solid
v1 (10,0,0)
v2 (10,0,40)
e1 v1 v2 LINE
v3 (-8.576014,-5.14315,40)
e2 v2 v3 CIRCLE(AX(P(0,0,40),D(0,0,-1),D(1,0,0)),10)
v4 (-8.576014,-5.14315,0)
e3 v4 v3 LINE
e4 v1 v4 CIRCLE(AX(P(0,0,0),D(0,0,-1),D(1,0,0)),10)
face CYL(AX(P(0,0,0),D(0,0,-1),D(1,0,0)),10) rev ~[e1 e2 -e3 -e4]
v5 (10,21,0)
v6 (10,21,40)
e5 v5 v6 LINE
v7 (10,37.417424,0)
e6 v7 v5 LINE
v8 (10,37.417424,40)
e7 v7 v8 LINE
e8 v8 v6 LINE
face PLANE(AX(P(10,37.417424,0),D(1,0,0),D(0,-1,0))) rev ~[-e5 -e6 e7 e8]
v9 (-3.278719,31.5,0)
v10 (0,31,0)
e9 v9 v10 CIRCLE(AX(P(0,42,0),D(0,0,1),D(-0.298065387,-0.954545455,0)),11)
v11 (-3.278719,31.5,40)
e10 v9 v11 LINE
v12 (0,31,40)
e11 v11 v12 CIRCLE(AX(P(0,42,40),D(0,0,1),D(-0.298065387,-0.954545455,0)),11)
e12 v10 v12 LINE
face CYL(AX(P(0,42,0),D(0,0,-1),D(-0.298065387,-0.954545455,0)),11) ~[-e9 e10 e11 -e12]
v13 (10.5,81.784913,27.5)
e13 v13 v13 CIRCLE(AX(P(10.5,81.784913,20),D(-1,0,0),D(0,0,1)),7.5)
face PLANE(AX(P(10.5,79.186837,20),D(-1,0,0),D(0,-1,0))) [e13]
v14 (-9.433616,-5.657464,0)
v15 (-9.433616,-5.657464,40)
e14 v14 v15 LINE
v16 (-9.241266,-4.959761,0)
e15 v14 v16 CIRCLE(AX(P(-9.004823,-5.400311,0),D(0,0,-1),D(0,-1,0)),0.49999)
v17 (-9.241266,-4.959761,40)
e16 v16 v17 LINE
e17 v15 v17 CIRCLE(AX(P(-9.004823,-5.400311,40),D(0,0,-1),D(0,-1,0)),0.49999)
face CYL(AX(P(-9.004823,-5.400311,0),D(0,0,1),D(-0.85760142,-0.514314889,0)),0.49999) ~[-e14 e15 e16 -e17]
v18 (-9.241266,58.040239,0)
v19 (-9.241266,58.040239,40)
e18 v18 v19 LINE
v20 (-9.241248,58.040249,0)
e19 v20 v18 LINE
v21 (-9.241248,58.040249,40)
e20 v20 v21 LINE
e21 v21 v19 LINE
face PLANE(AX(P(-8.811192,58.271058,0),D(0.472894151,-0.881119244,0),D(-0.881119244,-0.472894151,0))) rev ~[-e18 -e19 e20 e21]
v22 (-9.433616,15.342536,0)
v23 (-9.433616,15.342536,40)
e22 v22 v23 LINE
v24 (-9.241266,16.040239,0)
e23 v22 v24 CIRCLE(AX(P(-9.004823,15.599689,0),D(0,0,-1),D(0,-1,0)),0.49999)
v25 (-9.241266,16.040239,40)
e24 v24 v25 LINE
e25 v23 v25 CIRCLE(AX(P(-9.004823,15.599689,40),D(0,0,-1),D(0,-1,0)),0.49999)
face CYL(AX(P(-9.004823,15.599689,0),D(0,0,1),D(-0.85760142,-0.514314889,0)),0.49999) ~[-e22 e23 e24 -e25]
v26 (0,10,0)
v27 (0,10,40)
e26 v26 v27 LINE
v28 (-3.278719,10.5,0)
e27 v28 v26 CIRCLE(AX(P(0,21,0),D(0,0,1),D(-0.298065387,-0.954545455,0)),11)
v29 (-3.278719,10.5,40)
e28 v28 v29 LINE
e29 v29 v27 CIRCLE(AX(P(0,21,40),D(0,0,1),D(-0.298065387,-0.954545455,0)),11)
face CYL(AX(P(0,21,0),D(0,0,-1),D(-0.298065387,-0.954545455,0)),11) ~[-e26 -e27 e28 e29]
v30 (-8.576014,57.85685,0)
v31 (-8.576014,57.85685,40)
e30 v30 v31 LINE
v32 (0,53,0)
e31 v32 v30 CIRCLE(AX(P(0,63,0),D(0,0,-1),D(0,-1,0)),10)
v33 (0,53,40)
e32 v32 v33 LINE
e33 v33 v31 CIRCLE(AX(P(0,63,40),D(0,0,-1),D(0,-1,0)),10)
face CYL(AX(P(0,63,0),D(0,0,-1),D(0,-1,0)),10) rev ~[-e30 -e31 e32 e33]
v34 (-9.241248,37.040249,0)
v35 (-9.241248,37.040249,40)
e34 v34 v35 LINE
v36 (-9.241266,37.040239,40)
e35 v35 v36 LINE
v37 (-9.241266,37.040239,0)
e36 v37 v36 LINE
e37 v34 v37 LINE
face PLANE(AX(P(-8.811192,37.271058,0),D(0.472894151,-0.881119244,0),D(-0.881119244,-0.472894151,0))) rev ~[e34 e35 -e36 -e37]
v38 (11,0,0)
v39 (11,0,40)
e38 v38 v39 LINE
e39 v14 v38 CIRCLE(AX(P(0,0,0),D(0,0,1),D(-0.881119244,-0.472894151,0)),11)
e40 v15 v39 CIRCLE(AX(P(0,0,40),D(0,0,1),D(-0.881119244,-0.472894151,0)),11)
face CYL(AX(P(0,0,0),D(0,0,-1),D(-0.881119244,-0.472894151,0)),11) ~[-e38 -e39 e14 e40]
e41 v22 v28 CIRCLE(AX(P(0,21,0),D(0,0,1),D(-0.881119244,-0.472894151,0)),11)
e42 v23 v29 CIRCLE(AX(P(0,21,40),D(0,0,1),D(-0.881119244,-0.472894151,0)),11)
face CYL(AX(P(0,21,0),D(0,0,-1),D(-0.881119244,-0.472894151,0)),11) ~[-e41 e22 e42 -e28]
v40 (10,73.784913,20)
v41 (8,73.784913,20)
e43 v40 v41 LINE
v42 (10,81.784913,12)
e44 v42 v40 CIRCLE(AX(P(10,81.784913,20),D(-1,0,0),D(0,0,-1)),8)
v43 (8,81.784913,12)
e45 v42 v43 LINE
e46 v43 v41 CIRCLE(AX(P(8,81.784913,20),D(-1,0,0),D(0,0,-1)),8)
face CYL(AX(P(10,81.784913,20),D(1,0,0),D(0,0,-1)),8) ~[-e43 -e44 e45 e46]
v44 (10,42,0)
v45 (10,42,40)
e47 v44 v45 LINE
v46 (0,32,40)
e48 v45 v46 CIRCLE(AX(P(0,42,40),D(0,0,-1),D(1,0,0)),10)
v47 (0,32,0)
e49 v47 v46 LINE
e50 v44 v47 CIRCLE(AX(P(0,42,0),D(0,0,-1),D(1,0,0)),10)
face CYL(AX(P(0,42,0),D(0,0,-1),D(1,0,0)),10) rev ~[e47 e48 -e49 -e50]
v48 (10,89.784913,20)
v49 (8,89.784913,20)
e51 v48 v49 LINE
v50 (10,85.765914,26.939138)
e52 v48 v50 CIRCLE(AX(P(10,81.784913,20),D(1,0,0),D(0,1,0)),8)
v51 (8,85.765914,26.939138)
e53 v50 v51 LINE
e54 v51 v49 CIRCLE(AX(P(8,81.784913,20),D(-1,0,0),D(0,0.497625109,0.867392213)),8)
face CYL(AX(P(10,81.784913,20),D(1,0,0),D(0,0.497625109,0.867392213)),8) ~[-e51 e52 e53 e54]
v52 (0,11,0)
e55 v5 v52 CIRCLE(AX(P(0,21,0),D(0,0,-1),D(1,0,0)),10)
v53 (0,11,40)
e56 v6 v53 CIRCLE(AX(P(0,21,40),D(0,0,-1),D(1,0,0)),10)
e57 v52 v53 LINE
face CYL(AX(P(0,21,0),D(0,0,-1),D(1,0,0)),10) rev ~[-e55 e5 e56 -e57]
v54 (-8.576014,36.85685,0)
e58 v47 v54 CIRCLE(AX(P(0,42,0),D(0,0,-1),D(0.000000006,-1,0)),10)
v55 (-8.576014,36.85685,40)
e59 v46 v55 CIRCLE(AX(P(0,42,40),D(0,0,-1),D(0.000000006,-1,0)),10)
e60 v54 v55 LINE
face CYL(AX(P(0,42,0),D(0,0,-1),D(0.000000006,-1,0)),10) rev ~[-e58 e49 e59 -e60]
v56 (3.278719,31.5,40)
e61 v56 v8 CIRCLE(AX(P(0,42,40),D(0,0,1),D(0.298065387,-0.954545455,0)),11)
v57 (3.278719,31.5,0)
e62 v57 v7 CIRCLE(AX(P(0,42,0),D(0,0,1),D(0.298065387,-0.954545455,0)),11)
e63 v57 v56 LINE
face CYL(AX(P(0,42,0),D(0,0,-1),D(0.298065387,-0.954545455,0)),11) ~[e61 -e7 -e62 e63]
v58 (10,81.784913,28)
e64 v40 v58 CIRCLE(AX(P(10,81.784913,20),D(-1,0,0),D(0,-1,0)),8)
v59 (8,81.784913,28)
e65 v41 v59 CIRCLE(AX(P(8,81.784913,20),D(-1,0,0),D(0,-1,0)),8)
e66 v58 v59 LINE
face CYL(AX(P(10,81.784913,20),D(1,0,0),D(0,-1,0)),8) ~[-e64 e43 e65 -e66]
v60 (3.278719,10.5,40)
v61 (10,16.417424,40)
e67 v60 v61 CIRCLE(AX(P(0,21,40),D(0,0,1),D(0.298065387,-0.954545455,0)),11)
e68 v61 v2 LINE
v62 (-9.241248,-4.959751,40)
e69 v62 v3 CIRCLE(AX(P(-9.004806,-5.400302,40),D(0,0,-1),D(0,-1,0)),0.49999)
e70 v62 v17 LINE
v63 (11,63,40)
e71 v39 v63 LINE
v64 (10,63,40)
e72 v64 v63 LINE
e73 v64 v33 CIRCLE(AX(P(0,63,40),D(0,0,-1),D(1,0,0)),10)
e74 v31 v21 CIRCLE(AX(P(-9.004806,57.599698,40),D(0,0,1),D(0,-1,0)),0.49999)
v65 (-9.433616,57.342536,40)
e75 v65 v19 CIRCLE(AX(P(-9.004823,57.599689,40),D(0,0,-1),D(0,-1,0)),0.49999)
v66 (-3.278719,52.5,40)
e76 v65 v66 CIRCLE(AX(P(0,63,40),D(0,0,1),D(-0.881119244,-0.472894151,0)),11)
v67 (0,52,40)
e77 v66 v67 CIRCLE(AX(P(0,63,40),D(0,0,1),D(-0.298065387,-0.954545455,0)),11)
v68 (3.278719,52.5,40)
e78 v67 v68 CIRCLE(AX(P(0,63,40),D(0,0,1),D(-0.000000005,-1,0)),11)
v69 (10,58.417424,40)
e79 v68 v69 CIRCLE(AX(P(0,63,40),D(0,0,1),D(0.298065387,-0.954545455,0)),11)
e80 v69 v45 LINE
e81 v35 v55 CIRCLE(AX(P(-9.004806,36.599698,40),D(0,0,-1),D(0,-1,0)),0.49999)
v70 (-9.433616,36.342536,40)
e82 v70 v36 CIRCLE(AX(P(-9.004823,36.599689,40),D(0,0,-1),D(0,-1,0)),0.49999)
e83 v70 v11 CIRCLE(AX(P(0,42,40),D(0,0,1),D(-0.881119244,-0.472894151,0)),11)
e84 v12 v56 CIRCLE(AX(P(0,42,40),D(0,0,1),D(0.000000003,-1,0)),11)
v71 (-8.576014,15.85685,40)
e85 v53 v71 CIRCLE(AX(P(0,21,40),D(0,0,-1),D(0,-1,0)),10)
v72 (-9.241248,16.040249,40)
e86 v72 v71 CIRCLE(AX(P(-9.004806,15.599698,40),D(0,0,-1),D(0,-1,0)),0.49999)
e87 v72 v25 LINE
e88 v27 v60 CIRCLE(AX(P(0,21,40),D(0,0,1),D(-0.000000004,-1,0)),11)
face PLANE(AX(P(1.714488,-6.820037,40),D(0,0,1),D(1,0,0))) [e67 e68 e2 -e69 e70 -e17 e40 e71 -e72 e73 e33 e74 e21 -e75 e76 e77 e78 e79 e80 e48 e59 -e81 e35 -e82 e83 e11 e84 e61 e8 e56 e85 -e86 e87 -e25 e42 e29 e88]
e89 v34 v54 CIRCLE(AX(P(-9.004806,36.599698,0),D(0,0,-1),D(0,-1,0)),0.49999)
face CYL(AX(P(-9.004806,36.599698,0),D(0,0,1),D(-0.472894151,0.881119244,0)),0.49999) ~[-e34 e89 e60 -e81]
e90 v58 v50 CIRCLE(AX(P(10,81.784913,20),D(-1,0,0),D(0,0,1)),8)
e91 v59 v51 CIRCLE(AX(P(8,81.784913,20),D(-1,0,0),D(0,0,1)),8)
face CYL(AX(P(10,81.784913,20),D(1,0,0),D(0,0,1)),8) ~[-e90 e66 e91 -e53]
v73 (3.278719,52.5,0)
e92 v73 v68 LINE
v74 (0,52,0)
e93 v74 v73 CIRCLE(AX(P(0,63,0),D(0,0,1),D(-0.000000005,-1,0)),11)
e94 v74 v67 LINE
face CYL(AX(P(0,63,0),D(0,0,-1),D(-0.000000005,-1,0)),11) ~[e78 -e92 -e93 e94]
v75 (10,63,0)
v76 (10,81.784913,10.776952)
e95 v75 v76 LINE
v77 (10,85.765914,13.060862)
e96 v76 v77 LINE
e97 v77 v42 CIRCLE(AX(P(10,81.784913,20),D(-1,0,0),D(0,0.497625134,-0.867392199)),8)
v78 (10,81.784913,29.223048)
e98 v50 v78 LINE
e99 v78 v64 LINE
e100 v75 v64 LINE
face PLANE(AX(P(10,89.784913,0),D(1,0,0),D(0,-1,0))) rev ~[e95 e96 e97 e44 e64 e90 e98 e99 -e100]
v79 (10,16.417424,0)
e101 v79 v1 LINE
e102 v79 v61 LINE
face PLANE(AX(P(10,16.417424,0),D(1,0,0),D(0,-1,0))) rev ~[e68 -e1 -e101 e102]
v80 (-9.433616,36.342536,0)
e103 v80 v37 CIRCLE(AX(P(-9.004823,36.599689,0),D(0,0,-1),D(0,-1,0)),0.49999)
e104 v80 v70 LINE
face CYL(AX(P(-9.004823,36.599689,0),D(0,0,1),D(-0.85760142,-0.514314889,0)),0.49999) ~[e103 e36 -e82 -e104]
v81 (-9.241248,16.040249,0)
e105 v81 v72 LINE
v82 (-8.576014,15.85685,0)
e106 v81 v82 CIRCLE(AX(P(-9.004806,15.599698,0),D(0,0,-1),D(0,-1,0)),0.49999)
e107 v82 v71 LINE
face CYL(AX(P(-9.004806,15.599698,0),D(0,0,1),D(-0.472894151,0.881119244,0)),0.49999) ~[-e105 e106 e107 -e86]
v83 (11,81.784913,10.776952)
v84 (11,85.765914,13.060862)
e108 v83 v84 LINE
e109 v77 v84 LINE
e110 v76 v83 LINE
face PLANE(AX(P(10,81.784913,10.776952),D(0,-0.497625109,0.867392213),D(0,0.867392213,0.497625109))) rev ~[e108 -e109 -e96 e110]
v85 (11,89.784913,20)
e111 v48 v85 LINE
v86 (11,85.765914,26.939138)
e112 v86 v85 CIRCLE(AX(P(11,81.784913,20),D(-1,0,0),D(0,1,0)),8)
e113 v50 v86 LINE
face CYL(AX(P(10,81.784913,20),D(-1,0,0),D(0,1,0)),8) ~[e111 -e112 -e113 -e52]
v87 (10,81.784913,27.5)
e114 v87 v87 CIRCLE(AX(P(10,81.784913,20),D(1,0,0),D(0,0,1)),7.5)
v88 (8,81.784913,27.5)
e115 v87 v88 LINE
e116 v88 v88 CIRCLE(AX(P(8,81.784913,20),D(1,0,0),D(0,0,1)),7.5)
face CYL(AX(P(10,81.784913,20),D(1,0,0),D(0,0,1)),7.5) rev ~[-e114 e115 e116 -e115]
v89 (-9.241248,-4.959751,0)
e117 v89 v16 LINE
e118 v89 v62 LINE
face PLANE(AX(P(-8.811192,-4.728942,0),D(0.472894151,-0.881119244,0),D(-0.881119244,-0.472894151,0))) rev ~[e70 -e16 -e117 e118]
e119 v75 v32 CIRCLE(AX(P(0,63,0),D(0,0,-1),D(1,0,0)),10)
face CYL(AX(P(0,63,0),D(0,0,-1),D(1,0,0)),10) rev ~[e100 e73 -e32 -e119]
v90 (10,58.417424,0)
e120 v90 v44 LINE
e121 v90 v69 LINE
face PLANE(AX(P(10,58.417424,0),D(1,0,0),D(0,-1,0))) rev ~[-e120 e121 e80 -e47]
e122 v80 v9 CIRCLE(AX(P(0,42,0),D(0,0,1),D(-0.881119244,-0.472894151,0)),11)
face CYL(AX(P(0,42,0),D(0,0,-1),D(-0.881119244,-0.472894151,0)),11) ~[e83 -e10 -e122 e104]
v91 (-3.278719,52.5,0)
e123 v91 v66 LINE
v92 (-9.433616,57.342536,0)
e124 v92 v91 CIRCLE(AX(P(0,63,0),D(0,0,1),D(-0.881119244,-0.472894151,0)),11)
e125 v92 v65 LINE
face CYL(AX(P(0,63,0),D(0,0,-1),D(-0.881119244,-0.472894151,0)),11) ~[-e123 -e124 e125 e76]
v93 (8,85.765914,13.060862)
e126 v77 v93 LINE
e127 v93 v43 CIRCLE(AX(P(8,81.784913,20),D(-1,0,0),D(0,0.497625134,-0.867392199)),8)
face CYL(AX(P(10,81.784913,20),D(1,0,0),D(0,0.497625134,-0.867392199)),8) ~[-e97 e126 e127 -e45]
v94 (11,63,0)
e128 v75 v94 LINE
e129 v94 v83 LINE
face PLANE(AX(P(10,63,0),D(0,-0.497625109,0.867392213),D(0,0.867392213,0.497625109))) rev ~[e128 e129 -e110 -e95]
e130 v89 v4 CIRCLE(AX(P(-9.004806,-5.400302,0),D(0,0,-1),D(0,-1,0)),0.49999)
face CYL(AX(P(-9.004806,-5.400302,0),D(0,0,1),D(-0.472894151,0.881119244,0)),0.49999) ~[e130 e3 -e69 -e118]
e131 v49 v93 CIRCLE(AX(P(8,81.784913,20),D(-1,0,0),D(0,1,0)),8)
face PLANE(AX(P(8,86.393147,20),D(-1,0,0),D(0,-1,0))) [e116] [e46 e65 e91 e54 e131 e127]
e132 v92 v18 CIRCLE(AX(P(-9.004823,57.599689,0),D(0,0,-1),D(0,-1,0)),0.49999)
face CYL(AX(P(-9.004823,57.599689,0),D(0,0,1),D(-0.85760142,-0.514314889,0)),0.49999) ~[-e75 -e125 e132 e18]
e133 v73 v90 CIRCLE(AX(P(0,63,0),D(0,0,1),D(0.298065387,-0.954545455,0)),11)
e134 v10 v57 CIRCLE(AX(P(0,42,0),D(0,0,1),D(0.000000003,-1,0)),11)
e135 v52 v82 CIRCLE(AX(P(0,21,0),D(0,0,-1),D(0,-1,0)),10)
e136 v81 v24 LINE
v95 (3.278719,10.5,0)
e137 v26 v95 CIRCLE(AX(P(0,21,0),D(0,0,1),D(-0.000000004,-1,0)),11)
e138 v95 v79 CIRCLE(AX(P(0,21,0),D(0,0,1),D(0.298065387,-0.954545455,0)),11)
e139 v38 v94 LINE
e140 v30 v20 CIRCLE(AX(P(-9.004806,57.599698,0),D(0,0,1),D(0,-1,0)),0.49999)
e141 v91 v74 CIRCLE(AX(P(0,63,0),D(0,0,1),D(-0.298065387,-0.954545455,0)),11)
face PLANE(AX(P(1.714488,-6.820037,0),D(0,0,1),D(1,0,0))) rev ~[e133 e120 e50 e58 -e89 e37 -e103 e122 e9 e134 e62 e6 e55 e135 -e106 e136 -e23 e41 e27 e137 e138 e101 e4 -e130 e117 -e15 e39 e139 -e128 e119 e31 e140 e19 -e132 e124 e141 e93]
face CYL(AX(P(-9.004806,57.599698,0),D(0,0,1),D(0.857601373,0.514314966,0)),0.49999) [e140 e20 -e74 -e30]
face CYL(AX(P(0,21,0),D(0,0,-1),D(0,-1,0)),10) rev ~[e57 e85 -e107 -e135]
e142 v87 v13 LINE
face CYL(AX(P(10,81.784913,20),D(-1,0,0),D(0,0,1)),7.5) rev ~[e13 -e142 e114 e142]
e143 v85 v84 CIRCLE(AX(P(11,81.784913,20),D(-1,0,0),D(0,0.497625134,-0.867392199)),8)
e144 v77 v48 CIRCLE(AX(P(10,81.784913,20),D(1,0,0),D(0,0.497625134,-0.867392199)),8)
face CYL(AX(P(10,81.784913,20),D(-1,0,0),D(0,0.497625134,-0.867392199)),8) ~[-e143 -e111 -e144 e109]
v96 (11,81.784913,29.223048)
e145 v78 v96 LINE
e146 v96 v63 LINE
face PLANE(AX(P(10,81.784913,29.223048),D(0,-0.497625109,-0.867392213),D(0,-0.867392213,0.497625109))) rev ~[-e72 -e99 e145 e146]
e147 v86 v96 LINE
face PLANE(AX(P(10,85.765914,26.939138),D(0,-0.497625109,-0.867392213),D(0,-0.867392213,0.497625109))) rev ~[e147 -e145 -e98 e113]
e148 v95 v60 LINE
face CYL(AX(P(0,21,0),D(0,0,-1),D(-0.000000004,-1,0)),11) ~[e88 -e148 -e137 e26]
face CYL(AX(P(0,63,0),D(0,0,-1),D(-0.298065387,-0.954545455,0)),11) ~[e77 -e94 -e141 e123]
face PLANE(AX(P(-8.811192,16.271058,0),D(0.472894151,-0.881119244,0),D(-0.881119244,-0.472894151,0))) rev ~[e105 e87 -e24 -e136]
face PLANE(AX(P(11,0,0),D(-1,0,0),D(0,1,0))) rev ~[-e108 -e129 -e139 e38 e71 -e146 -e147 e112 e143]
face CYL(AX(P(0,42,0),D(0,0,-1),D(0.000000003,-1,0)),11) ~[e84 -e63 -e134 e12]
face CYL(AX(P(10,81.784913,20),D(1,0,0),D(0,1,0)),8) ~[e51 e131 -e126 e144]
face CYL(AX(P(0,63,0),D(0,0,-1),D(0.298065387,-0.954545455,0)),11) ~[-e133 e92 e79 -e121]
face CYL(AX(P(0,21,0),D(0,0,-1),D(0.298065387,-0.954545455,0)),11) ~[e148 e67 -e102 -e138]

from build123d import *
from build123d import SkipClean  # not in build123d's __all__

# Parameters (mm, degrees)
F1_DEPTH = 40
F3_DEPTH = 1.001
F4_DEPTH = 2
F5_DEPTH = 0.5
F6_R     = 0.49999


# Not quite as in the source:
# - a fillet or chamfer is up to 0.001 mm smaller than in the source, because OpenCascade refuses the exact size


with BuildPart() as f1:
    # F0 (on Top) → F1 (new body)
    with BuildSketch(Plane.XY):
        with BuildLine():
            Line((11, 0), (10, 0))
            ThreePointArc((10, 0), (2.4380397486, -9.6982453147), (-8.8111924369, -4.7289415137))
            Line((-8.8111924369, -4.7289415137), (-9.6923116806, -5.2018356651))
            ThreePointArc((-9.6923116806, -5.2018356651), (2.6818437234, -10.6680698462), (11, 0))
        make_face()
        with BuildLine():
            Line((10, 4.582575695), (10, 0))
            Line((10, 0), (11, 0))
            ThreePointArc((11, 0), (10.7470926301, 2.3452078799), (10, 4.582575695))
        make_face()
        with BuildLine():
            Line((10, 16.417424305), (10, 4.582575695))
            ThreePointArc((10, 4.582575695), (10.7470926301, 2.3452078799), (11, 0))
            Line((11, 0), (11, 21))
            ThreePointArc((11, 21), (10.7470926301, 18.6547921201), (10, 16.417424305))
        make_face()
        with BuildLine():
            ThreePointArc((0, 11), (1.6583123952, 10.8742815855), (3.2787192622, 10.5))
            ThreePointArc((3.2787192622, 10.5), (7.2687738933, 12.743794692), (10, 16.417424305))
            Line((10, 16.417424305), (10, 21))
            ThreePointArc((10, 21), (7.0710678119, 13.9289321881), (0, 11))
        make_face()
        with BuildLine():
            ThreePointArc((-3.2787192622, 10.5), (-1.6583124171, 10.1257184179), (-4.44e-08, 10))
            ThreePointArc((-4.44e-08, 10), (1.6583123732, 10.1257184112), (3.2787192622, 10.5))
            ThreePointArc((3.2787192622, 10.5), (1.6583123952, 10.8742815855), (0, 11))
            ThreePointArc((0, 11), (-1.6583123952, 10.8742815855), (-3.2787192622, 10.5))
        make_face()
        with BuildLine():
            ThreePointArc((-9.6923116806, 15.7981643349), (-7.0056796429, 12.5194072884), (-3.2787192622, 10.5))
            ThreePointArc((-3.2787192622, 10.5), (-1.6583123952, 10.8742815855), (0, 11))
            ThreePointArc((0, 11), (-5.1337405886, 12.4183505333), (-8.8111924369, 16.2710584863))
            Line((-8.8111924369, 16.2710584863), (-9.6923116806, 15.7981643349))
        make_face()
        with BuildLine():
            Line((10, 21), (10, 16.417424305))
            ThreePointArc((10, 16.417424305), (10.7470926301, 18.6547921201), (11, 21))
            ThreePointArc((11, 21), (10.7470926301, 23.3452078799), (10, 25.582575695))
            Line((10, 25.582575695), (10, 21))
        make_face()
        with BuildLine():
            ThreePointArc((10, 25.582575695), (10.7470926301, 23.3452078799), (11, 21))
            Line((11, 21), (11, 42))
            ThreePointArc((11, 42), (10.7470926301, 39.6547921201), (10, 37.417424305))
            Line((10, 37.417424305), (10, 25.582575695))
        make_face()
        with BuildLine():
            ThreePointArc((5.81e-08, 32), (1.6583124239, 31.8742815811), (3.2787192622, 31.5))
            ThreePointArc((3.2787192622, 31.5), (7.2687738933, 33.743794692), (10, 37.417424305))
            Line((10, 37.417424305), (10, 42))
            ThreePointArc((10, 42), (7.0710678324, 34.9289322087), (5.81e-08, 32))
        make_face()
        with BuildLine():
            ThreePointArc((5.81e-08, 32), (-1.6583123665, 31.8742815898), (-3.2787192622, 31.5))
            ThreePointArc((-3.2787192622, 31.5), (-1.658312379, 31.1257184121), (3.28e-08, 31))
            ThreePointArc((3.28e-08, 31), (1.6583124114, 31.125718417), (3.2787192622, 31.5))
            ThreePointArc((3.2787192622, 31.5), (1.6583124239, 31.8742815811), (5.81e-08, 32))
        make_face()
        with BuildLine():
            ThreePointArc((-9.6923116806, 36.7981643349), (-7.0056796429, 33.5194072884), (-3.2787192622, 31.5))
            ThreePointArc((-3.2787192622, 31.5), (-1.6583123665, 31.8742815898), (5.81e-08, 32))
            ThreePointArc((5.81e-08, 32), (-5.1337405637, 33.4183505184), (-8.8111924369, 37.2710584863))
            Line((-8.8111924369, 37.2710584863), (-9.6923116806, 36.7981643349))
        make_face()
        with BuildLine():
            ThreePointArc((10, 37.417424305), (10.7470926301, 39.6547921201), (11, 42))
            ThreePointArc((11, 42), (10.7470926301, 44.3452078799), (10, 46.582575695))
            Line((10, 46.582575695), (10, 42))
            Line((10, 42), (10, 37.417424305))
        make_face()
        with BuildLine():
            ThreePointArc((10, 46.582575695), (10.7470926301, 44.3452078799), (11, 42))
            Line((11, 42), (11, 63))
            ThreePointArc((11, 63), (10.7470926301, 60.6547921201), (10, 58.417424305))
            Line((10, 58.417424305), (10, 46.582575695))
        make_face()
        with BuildLine():
            ThreePointArc((10, 58.417424305), (10.7470926301, 60.6547921201), (11, 63))
            ThreePointArc((11, 63), (10.8000300748, 65.0879057409), (10.2073908395, 67.0998990536))
            Line((10.2073908395, 67.0998990536), (10, 67.0998990536))
            Line((10, 67.0998990536), (10, 63))
            Line((10, 63), (10, 58.417424305))
        make_face()
        with BuildLine():
            ThreePointArc((0, 53), (1.6583123952, 52.8742815855), (3.2787192622, 52.5))
            ThreePointArc((3.2787192622, 52.5), (7.2687738933, 54.743794692), (10, 58.417424305))
            Line((10, 58.417424305), (10, 63))
            ThreePointArc((10, 63), (7.0710678119, 55.9289321881), (0, 53))
        make_face()
        with BuildLine():
            ThreePointArc((-5.66e-08, 52), (1.6583123672, 52.1257184103), (3.2787192622, 52.5))
            ThreePointArc((3.2787192622, 52.5), (1.6583123952, 52.8742815855), (0, 53))
            ThreePointArc((0, 53), (-1.6583123952, 52.8742815855), (-3.2787192622, 52.5))
            ThreePointArc((-3.2787192622, 52.5), (-1.6583124232, 52.1257184188), (-5.66e-08, 52))
        make_face()
        with BuildLine():
            ThreePointArc((-9.6923116806, 57.7981643349), (-7.0056796429, 54.5194072884), (-3.2787192622, 52.5))
            ThreePointArc((-3.2787192622, 52.5), (-1.6583123952, 52.8742815855), (0, 53))
            ThreePointArc((0, 53), (-5.1337405886, 54.4183505333), (-8.8111924369, 58.2710584863))
            Line((-8.8111924369, 58.2710584863), (-9.6923116806, 57.7981643349))
        make_face()
        with BuildLine():
            ThreePointArc((10, 67.582575695), (10.1065773297, 67.3424756395), (10.2073908395, 67.0998990536))
            Line((10.2073908395, 67.0998990536), (11, 67.0998990536))
            Line((11, 67.0998990536), (11, 89.784912765))
            Line((11, 89.784912765), (10, 89.784912765))
            Line((10, 89.784912765), (10, 67.582575695))
        make_face()
        with BuildLine():
            ThreePointArc((10.2073908395, 67.0998990536), (10.8000300748, 65.0879057409), (11, 63))
            Line((11, 63), (11, 67.0998990536))
            Line((11, 67.0998990536), (10.2073908395, 67.0998990536))
        make_face()
        with BuildLine():
            Line((10, 67.0998990536), (10.2073908395, 67.0998990536))
            ThreePointArc((10.2073908395, 67.0998990536), (10.1065773297, 67.3424756395), (10, 67.582575695))
            Line((10, 67.582575695), (10, 67.0998990536))
        make_face()
    extrude(amount=F1_DEPTH)

    # F2 (on face) → F3 (cut, through all)
    with BuildSketch(Plane(origin=(10, 0, 0), x_dir=(0, -1, 0), z_dir=(-1, 0, 0))):
        Polygon((-81.784912765, 10.7769520171), (-81.784912765, 0), (-63, 0), align=None)
        with BuildLine():
            Line((-89.784912765, 0), (-81.784912765, 0))
            Line((-81.784912765, 0), (-81.784912765, 10.7769520171))
            Line((-81.784912765, 10.7769520171), (-85.7659138368, 13.0608624119))
            ThreePointArc((-85.7659138368, 13.0608624119), (-88.7076293046, 15.9905117892), (-89.784912765, 20))
            Line((-89.784912765, 20), (-89.784912765, 0))
        make_face()
        with BuildLine():
            Line((-89.784912765, 40), (-89.784912765, 20))
            ThreePointArc((-89.784912765, 20), (-88.7076292465, 24.0094883112), (-85.7659136356, 26.9391377035))
            Line((-85.7659136356, 26.9391377035), (-81.784912765, 29.2230479829))
            Line((-81.784912765, 29.2230479829), (-81.784912765, 40))
            Line((-81.784912765, 40), (-89.784912765, 40))
        make_face()
        Polygon((-81.784912765, 29.2230479829), (-63, 40), (-81.784912765, 40), align=None)
    extrude(amount=-F3_DEPTH, mode=Mode.SUBTRACT)

    # F2 (on face) → F4 (join)
    with BuildSketch(Plane(origin=(10, 0, 0), x_dir=(0, -1, 0), z_dir=(-1, 0, 0))):
        with BuildLine():
            ThreePointArc((-85.7659138368, 13.0608624119), (-83.8448762714, 12.2697638877), (-81.784912765, 12))
            Line((-81.784912765, 12), (-81.784912765, 12.5))
            ThreePointArc((-81.784912765, 12.5), (-89.284912765, 20), (-81.784912765, 27.5))
            Line((-81.784912765, 27.5), (-81.784912765, 28))
            ThreePointArc((-81.784912765, 28), (-83.8448761593, 27.7302361422), (-85.7659136356, 26.9391377035))
            ThreePointArc((-85.7659136356, 26.9391377035), (-88.7076292465, 24.0094883112), (-89.784912765, 20))
            ThreePointArc((-89.784912765, 20), (-88.7076293046, 15.9905117892), (-85.7659138368, 13.0608624119))
        make_face()
        with BuildLine():
            Line((-81.784912765, 12.5), (-81.784912765, 12))
            ThreePointArc((-81.784912765, 12), (-76.1280585155, 14.3431457505), (-73.784912765, 20))
            ThreePointArc((-73.784912765, 20), (-76.1280585155, 25.6568542495), (-81.784912765, 28))
            Line((-81.784912765, 28), (-81.784912765, 27.5))
            ThreePointArc((-81.784912765, 27.5), (-76.4816119061, 25.3033008589), (-74.284912765, 20))
            ThreePointArc((-74.284912765, 20), (-76.4816119061, 14.6966991411), (-81.784912765, 12.5))
        make_face()
    with SkipClean():  # cleaning this boolean's faces spoils the solid; the shape is the same uncleaned
        extrude(amount=F4_DEPTH)

    # F2 (on face) → F5 (cut)
    with BuildSketch(Plane(origin=(10, 0, 0), x_dir=(0, -1, 0), z_dir=(-1, 0, 0))):
        with BuildLine():
            Line((-81.784912765, 27.5), (-81.784912765, 12.5))
            ThreePointArc((-81.784912765, 12.5), (-76.4816119061, 14.6966991411), (-74.284912765, 20))
            ThreePointArc((-74.284912765, 20), (-76.4816119061, 25.3033008589), (-81.784912765, 27.5))
        make_face()
        with BuildLine():
            ThreePointArc((-81.784912765, 27.5), (-89.284912765, 20), (-81.784912765, 12.5))
            Line((-81.784912765, 12.5), (-81.784912765, 27.5))
        make_face()
    with SkipClean():  # cleaning this boolean's faces spoils the solid; the shape is the same uncleaned
        extrude(amount=-F5_DEPTH, mode=Mode.SUBTRACT)

    # F6 (radius 0.5 in the source; OpenCascade refuses exactly that, so slightly less here)
    f6_edges = [f1.edges().sort_by_distance(p)[0] for p in [
        (-8.811192, 58.271058, 20),
        (-9.692312, 57.798164, 20),
        (-8.811192, 37.271058, 20),
        (-9.692312, 36.798164, 20),
        (-8.811192, 16.271058, 20),
        (-9.692312, 15.798164, 20),
        (-8.811192, -4.728942, 20),
        (-9.692312, -5.201836, 20),
    ]]
    fillet(f6_edges, radius=F6_R)


solid = f1.part
